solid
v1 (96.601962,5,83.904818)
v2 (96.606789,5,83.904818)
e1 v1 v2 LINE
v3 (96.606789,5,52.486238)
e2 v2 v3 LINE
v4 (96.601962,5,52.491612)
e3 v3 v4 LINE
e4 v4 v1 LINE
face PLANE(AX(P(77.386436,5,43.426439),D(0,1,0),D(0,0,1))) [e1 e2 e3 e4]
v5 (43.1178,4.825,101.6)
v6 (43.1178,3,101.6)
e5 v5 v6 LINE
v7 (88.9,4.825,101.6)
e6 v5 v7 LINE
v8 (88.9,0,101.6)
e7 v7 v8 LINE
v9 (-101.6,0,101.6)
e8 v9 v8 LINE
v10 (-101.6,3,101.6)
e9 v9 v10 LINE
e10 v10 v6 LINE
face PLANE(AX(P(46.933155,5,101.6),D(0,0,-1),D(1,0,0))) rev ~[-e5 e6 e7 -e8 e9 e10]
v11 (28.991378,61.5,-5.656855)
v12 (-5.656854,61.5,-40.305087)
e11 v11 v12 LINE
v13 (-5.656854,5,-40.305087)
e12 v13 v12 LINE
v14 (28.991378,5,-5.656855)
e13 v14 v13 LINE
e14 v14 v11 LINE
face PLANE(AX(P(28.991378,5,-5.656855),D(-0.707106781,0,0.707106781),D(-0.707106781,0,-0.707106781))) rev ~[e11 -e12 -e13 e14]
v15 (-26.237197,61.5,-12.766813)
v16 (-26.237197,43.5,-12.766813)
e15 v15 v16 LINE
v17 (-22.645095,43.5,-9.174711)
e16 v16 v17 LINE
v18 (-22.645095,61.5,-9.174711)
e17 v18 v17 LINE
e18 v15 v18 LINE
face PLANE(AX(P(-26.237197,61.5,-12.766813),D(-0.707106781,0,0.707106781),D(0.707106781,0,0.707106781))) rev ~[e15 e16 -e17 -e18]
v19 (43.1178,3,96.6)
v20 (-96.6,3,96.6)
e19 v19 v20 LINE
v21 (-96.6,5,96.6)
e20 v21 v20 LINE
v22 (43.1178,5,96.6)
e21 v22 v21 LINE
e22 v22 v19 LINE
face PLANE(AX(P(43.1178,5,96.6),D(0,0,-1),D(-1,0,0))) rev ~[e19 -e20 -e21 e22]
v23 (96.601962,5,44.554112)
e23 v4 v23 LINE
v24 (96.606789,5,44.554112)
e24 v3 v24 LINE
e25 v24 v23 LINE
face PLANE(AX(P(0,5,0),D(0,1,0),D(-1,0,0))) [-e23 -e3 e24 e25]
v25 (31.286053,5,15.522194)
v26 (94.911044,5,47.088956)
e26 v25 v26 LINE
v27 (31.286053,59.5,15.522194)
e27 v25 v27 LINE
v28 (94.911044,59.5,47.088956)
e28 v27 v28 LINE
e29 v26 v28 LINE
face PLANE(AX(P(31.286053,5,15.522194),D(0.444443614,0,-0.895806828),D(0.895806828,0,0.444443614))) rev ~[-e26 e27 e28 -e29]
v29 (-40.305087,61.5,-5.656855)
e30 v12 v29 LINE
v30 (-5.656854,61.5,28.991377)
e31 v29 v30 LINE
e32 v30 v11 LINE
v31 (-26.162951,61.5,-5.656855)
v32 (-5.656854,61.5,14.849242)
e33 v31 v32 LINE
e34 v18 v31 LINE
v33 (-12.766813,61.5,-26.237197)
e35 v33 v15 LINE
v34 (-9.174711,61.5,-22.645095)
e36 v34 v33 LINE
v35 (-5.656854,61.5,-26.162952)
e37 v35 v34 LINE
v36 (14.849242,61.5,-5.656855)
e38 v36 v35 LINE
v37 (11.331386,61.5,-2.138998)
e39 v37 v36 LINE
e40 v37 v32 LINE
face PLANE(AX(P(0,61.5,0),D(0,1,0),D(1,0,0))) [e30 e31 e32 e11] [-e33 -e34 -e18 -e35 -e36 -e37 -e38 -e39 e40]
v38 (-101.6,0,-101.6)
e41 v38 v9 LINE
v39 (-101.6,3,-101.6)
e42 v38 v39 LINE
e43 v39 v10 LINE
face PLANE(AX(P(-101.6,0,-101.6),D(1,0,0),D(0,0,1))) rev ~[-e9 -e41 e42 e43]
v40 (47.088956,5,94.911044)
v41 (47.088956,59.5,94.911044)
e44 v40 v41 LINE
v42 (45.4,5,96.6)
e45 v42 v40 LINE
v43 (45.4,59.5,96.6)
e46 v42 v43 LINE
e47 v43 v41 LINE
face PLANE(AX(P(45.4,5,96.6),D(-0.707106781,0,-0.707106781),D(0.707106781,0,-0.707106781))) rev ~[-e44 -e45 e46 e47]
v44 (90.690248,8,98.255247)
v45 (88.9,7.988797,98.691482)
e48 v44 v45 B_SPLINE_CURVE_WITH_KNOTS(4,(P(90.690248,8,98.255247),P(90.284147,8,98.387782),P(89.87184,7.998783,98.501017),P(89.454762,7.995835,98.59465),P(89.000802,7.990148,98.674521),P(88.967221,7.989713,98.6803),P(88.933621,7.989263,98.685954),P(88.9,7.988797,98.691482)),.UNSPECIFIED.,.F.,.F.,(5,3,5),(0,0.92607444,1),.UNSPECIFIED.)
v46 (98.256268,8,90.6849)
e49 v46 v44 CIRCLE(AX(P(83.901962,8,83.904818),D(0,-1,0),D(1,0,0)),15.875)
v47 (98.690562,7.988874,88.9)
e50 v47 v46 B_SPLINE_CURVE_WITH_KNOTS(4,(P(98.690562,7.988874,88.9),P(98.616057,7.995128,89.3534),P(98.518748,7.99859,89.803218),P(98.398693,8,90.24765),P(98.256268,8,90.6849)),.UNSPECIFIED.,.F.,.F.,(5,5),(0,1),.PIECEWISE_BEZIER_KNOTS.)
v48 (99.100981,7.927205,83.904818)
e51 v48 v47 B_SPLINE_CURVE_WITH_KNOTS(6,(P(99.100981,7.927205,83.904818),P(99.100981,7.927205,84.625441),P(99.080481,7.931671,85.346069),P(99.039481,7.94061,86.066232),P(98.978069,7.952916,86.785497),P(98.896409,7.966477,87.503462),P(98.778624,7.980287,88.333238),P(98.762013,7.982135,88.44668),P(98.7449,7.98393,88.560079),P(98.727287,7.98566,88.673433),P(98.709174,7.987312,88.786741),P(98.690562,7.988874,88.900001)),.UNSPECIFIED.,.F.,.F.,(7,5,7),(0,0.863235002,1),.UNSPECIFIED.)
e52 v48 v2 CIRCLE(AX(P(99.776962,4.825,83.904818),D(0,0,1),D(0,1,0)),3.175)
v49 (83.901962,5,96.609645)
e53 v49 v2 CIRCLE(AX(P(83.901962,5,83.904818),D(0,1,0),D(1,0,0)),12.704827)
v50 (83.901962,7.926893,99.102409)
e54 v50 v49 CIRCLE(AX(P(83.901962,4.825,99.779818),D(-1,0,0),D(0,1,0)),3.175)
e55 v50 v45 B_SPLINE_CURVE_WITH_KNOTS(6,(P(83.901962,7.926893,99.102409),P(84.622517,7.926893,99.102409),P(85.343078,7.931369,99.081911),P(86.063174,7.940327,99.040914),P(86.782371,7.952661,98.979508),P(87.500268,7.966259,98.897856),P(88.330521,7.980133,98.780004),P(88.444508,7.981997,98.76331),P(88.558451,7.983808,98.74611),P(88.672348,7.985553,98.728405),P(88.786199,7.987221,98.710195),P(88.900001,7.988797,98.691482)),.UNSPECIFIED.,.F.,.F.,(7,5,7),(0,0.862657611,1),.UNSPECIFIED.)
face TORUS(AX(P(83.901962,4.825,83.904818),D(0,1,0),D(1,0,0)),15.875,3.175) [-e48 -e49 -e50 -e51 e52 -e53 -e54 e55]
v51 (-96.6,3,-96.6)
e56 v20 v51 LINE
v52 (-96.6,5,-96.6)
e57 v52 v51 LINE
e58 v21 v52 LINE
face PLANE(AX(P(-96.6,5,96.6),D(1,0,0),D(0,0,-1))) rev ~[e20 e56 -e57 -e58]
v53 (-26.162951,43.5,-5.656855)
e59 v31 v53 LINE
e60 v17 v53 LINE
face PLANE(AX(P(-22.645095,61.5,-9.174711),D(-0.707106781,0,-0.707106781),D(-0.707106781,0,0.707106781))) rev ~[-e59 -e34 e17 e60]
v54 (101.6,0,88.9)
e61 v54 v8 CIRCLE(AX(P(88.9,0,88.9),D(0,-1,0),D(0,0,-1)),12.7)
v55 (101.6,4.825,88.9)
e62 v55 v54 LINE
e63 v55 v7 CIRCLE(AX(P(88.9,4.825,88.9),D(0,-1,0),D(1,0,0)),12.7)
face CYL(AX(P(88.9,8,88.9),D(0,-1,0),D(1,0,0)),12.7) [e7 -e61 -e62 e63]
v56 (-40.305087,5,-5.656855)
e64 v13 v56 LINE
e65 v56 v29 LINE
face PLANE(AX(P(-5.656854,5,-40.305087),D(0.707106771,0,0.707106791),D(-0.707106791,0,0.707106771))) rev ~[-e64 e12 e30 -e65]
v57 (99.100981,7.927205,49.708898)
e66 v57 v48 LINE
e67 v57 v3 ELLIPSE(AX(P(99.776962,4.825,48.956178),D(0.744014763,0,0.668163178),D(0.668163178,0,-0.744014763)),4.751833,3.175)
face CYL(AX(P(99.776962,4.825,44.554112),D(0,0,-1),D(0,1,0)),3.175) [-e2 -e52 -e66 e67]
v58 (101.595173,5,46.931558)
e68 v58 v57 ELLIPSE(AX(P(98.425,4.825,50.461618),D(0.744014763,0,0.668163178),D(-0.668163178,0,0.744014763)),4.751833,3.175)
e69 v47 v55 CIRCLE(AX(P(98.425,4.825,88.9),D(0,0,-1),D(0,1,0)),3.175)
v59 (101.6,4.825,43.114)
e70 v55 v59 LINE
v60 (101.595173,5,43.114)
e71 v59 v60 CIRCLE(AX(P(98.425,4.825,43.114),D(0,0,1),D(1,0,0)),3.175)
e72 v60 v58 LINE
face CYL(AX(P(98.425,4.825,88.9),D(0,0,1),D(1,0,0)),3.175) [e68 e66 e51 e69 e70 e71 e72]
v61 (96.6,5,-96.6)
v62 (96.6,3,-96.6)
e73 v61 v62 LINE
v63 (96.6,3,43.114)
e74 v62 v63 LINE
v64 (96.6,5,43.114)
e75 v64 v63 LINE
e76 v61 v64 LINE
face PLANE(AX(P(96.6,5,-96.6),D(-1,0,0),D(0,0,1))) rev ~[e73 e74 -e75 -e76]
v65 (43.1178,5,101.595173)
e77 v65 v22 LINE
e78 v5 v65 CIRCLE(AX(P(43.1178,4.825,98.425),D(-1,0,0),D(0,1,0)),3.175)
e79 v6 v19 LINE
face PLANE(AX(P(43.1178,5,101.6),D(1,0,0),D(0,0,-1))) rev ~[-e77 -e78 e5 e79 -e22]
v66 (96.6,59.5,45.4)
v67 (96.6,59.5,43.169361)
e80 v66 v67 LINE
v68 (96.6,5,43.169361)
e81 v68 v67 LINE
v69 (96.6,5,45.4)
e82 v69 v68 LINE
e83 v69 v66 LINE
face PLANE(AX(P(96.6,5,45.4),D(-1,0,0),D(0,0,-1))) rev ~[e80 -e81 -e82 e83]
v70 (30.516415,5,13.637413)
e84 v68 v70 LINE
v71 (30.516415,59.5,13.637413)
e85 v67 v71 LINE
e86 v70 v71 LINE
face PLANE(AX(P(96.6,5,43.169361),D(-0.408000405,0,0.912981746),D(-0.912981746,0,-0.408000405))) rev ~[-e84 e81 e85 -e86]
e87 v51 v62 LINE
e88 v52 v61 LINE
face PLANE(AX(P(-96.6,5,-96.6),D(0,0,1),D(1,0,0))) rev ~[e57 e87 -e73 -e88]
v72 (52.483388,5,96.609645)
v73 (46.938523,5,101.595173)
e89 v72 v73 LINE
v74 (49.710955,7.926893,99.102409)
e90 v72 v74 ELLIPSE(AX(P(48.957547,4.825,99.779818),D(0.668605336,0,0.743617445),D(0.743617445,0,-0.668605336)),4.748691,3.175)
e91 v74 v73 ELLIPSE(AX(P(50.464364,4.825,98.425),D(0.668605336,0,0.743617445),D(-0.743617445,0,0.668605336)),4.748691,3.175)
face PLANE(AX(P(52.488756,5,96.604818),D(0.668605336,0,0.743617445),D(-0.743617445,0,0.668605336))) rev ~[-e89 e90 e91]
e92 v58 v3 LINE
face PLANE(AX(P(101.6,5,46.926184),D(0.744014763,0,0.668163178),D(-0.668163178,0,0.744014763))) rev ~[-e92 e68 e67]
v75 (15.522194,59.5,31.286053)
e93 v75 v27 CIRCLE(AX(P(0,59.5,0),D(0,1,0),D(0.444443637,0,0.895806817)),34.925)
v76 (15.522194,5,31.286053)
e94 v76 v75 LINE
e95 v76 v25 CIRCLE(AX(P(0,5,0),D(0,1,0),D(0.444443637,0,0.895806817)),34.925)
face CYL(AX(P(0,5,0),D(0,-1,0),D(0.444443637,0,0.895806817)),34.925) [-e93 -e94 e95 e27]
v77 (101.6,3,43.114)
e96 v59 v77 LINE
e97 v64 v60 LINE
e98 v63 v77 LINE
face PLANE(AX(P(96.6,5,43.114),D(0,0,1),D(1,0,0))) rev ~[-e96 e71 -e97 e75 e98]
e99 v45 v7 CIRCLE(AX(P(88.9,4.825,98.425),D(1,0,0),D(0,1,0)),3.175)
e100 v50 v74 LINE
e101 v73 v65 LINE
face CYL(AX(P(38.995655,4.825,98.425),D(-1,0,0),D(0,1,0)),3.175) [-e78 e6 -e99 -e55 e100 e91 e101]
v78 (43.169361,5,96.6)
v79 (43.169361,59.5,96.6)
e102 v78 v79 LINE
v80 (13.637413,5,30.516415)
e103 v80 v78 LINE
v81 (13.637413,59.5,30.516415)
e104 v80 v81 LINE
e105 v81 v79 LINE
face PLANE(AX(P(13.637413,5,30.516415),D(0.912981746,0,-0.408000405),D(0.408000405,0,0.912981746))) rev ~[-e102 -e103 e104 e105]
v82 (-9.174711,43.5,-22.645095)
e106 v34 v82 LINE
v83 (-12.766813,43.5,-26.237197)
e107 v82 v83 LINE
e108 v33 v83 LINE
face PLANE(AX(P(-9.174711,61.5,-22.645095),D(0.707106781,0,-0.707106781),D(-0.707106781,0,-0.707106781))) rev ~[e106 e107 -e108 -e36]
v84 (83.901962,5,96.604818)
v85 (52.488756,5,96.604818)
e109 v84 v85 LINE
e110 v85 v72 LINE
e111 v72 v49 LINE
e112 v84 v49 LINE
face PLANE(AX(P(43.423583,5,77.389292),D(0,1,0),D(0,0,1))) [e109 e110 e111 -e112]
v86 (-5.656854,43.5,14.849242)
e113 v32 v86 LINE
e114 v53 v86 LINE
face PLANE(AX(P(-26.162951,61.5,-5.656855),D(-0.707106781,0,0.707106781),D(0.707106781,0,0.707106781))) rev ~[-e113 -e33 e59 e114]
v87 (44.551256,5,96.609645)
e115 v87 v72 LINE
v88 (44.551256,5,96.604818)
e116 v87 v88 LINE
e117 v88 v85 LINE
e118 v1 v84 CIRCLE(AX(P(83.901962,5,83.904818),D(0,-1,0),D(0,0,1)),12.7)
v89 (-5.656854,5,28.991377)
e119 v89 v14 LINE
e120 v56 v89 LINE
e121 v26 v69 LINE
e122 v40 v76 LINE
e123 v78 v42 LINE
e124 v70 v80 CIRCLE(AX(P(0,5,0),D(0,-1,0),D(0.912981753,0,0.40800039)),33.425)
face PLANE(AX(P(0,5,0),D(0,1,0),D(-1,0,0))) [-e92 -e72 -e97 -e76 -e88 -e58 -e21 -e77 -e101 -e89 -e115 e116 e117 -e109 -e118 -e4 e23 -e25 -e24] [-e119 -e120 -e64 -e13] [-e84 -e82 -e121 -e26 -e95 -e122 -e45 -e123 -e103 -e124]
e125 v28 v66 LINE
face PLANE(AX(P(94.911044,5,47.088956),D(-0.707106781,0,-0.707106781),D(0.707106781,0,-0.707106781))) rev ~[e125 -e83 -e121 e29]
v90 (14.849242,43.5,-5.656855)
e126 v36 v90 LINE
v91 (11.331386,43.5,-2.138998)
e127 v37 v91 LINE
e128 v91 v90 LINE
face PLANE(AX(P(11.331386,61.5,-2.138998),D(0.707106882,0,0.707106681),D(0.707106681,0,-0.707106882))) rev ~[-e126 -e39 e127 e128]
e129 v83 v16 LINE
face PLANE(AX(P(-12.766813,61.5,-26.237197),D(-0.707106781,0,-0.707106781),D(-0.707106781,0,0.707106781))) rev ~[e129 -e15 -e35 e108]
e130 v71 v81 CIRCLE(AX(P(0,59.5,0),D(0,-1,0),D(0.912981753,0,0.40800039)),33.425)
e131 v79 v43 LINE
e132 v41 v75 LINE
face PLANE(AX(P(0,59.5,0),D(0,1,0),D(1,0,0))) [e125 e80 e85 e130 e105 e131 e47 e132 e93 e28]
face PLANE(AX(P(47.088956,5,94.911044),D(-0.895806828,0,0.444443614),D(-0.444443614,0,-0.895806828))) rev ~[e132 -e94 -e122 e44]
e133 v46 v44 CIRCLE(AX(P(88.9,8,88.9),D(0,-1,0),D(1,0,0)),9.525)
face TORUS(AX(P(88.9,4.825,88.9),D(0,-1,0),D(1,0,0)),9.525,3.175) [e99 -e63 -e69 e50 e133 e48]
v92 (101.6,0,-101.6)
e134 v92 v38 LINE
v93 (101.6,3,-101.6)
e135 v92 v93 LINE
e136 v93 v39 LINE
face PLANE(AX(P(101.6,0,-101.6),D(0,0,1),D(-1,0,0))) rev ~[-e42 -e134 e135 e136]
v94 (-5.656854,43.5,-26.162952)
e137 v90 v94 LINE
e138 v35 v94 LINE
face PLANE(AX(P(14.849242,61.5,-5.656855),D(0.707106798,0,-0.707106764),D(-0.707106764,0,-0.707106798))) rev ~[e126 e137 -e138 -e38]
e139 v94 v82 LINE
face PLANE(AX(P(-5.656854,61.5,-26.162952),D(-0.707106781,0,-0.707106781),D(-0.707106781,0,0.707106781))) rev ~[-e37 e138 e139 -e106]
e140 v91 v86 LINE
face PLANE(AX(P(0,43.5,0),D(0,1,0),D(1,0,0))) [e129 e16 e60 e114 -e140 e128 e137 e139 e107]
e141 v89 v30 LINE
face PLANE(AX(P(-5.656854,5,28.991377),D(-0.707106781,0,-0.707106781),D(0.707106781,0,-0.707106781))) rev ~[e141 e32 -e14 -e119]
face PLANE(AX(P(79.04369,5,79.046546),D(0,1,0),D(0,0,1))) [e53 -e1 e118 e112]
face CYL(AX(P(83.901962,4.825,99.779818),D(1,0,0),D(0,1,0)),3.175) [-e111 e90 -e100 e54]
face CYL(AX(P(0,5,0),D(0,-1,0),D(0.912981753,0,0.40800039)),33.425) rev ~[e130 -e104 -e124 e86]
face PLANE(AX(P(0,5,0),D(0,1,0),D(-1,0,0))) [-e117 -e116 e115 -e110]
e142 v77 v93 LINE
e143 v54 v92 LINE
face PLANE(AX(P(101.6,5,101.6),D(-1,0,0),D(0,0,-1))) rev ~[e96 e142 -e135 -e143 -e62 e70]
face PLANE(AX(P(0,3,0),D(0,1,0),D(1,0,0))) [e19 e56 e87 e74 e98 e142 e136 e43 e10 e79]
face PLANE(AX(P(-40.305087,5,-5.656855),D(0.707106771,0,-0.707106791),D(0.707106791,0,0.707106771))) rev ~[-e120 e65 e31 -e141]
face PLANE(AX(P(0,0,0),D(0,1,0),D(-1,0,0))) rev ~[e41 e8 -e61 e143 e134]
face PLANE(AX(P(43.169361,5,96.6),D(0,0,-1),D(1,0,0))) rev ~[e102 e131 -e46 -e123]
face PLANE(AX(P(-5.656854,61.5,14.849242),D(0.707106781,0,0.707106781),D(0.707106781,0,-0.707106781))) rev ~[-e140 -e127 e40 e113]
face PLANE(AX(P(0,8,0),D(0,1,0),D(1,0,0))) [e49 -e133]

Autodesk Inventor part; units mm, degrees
ref_plane "YZ Plane" through (0, 0, 0) normal (1, 0, 0) x (0, 1, 0)
ref_plane "XZ Plane" through (0, 0, 0) normal (0, 1, 0) x (-1, 0, 0)
ref_plane "XY Plane" through (0, 0, 0) normal (0, 0, 1) x (1, 0, 0)
sketch "Sketch1" plane through (0, 0, 0) normal (0, 1, 0) x (-1, 0, 0)
  line L0 (101.6, -101.6) -> (-101.6, -101.6)
  line L1 (-101.6, -101.6) -> (-101.6, 101.6)
  line L2 (-101.6, 101.6) -> (101.6, 101.6)
  line L3 (101.6, 101.6) -> (101.6, -101.6)
  line L4 (96.6, -96.6) -> (-96.6, -96.6)
  line L5 (-96.6, -96.6) -> (-96.6, 96.6)
  line L6 (-96.6, 96.6) -> (96.6, 96.6)
  line L7 (96.6, 96.6) -> (96.6, -96.6)
  line L8 (101.6, 101.6) -> (-40.4, 101.6)
  circle A0 centre (0, 0) radius 88.9
  circle A1 centre (0, 0) radius 109.337642
  line L9 (-40.4, 101.6) -> (-101.6, 40.4)
  line L10 (-45.4, 101.6) -> (-101.6, 45.4)
  line L11 (96.6, 96.6) -> (96.6, 101.6)
  line L12 (-45.4, 101.6) -> (-35.4, 101.6)
  line L13 (-35.4, 101.6) -> (-35.4, 96.6)
  line L14 (-35.4, 96.6) -> (-45.4, 96.6)
  line L15 (-45.4, 96.6) -> (-45.4, 101.6)
  line L16 (-45.4, 101.6) -> (-43.114, 101.6)
  line L17 (-43.114, 101.6) -> (-43.114, 96.6)
  line L18 (-43.114, 96.6) -> (-45.4, 96.6)
  line L19 (-45.4, 96.6) -> (-45.4, 101.6)
  line L20 (-96.6, 45.4) -> (-101.6, 45.4)
  line L21 (-101.6, 45.4) -> (-101.6, 43.114)
  line L22 (-101.6, 43.114) -> (-96.6, 43.114)
  line L23 (-96.6, 43.114) -> (-96.6, 45.4)
  point P0 (96.6, 51.216794)
  point P1 (101.6, 40.4)
  point P2 (101.6, -40.4)
  point P3 (96.6, -51.216794)
  point P4 (-96.6, 45.4)
  point P5 (-45.4, 96.6)
  dimension "d0" = 203.2
  dimension "d1" = 203.2
  dimension "d2" = 101.6
  dimension "d3" = 101.6
  dimension "d4" = 5
  dimension "d5" = 5
  dimension "d6" = 5
  dimension "d7" = 5
  dimension "d10" = 142
  dimension "d12" = 61.2
  dimension "d14" = 177.8
  dimension "d15" = 5
  dimension "d16" = 5
  dimension "d17" = 10
  dimension "d86" = 2.286
  dimension "d87" = 2.286
sketch "Sketch1 outline for Extrusion1" plane through (0, 0, 0) normal (0, 1, 0) x (-1, 0, 0)
  line L0 (-101.6, -101.6) -> (101.6, -101.6)
  line L1 (101.6, -101.6) -> (101.6, 101.6)
  line L2 (101.6, 101.6) -> (-101.6, 101.6)
  line L3 (-101.6, 101.6) -> (-101.6, -101.6)
extrude "Extrusion1" add sketch "Sketch1 outline for Extrusion1" along normal blind 5
sketch "Sketch3" plane through (0, 5, 0) normal (0, 1, 0) x (1, 0, 0)
  circle A0 centre (0, 0) radius 88.9
  line L0 (-101.6, 101.6) -> (-101.6, -101.6)
  line L1 (-101.6, -101.6) -> (101.6, -101.6)
  line L2 (-101.6, 101.6) -> (101.6, 101.6)
  line L3 (101.6, 101.6) -> (101.6, -101.6)
  line L4 (101.6, -101.6) -> (-101.6, -101.6)
  line L5 (-101.6, -101.6) -> (-101.6, 101.6)
  line L6 (-96.6, 96.6) -> (96.6, 96.6)
  line L7 (96.6, 96.6) -> (96.6, -96.6)
  line L8 (96.6, -96.6) -> (-96.6, -96.6)
  line L9 (-96.6, -96.6) -> (-96.6, 96.6)
  line L10 (-101.6, -101.6) -> (40.4, -101.6)
  circle A1 centre (0, 0) radius 109.337642
  line L11 (40.4, -101.6) -> (101.6, -40.4)
  line L12 (101.6, -101.6) -> (101.6, 101.6)
  line L13 (45.4038, -101.6) -> (101.6, -45.4038)
  line L14 (96.6, -45.4) -> (101.6, -45.4038)
  line L15 (45.4, -96.6) -> (45.4038, -101.6)
  line L16 (96.6, -45.4) -> (101.6, -45.4)
  line L17 (101.6, -45.4) -> (101.6, -43.114)
  line L18 (101.6, -43.114) -> (96.6, -43.114)
  line L19 (96.6, -43.114) -> (96.6, -45.4)
  line L20 (45.4038, -101.6) -> (43.1178, -101.6)
  line L21 (43.1178, -101.6) -> (43.1178, -96.6)
  line L22 (43.1178, -96.6) -> (45.4038, -96.6)
  line L23 (45.4038, -96.6) -> (45.4038, -101.6)
  point P0 (45.4038, -101.6)
  point P1 (50.4038, -96.6)
  point P2 (96.6, -50.4038)
  dimension "d28" = 177.8
  dimension "d29" = 5
  dimension "d30" = 5
  dimension "d31" = 5
  dimension "d32" = 5
  dimension "d33" = 142
  dimension "d76" = 5.0038
  dimension "d77" = 5.0038
  dimension "d88" = 2.286
  dimension "d89" = 2.286
sketch "Sketch3 outline for Extrusion3" plane through (0, 5, 0) normal (0, 1, 0) x (1, 0, 0)
  line L0 (43.1178, -101.6) -> (43.1178, -96.6)
  line L1 (-101.6, -101.6) -> (43.1178, -101.6)
  line L2 (-101.6, 101.6) -> (-101.6, -101.6)
  line L3 (101.6, 101.6) -> (-101.6, 101.6)
  line L4 (101.6, -43.114) -> (101.6, 101.6)
  line L5 (96.6, -43.114) -> (101.6, -43.114)
  line L6 (96.6, 96.6) -> (96.6, -43.114)
  line L7 (-96.6, 96.6) -> (96.6, 96.6)
  line L8 (-96.6, -96.6) -> (-96.6, 96.6)
  line L9 (43.1178, -96.6) -> (-96.6, -96.6)
extrude "Extrusion3" cut sketch "Sketch3 outline for Extrusion3" against normal blind 2
sketch "Sketch4" plane through (0, 5, 0) normal (0, 1, 0) x (1, 0, 0)
  line L0 (101.6, 101.6) -> (-101.6, 101.6)
  line L1 (-101.6, 101.6) -> (-101.6, -101.6)
  line L2 (-101.6, -101.6) -> (101.6, -101.6)
  line L3 (101.6, -101.6) -> (101.6, 101.6)
  circle A0 centre (0, 0) radius 2.5
  line L4 (11.331386, 2.138998) -> (-2.138998, -11.331386)
  line L5 (0, 0) -> (-5.656854, 5.656854)
  line L6 (-5.656854, -14.849242) -> (-26.162951, 5.656855)
  line L7 (-5.656854, 26.162952) -> (14.849242, 5.656855)
  circle A1 centre (-5.656854, 5.656854) radius 14
  line L8 (-26.162951, 5.656855) -> (-5.656854, 26.162952)
  line L9 (14.849242, 5.656855) -> (-5.656854, -14.849242)
  line L10 (-40.305087, 5.656855) -> (-5.656854, 40.305087)
  line L11 (-5.656854, 40.305087) -> (28.991378, 5.656855)
  line L12 (28.991378, 5.656855) -> (-5.656854, -28.991377)
  line L13 (-5.656854, -28.991377) -> (-40.305087, 5.656855)
  line L14 (-22.645095, 9.174711) -> (-9.174711, 22.645095)
  line L15 (-9.174711, 22.645095) -> (-12.766813, 26.237197)
  line L16 (-12.766813, 26.237197) -> (-26.237197, 12.766813)
  line L17 (-26.237197, 12.766813) -> (-22.645095, 9.174711)
  point P0 (9.525, 22.5)
  point P1 (-9.525, -6.5)
  dimension "d37" = 203.2
  dimension "d38" = 203.2
  dimension "d39" = 8
  dimension "d40" = 28
  dimension "d41" = 29
  dimension "d42" = 29
  dimension "d43" = 14.5
  dimension "d44" = 10
  dimension "d45" = 10
  dimension "d46" = 10
  dimension "d47" = 10
  dimension "d48" = 5.08
  dimension "d49" = 9.525
  dimension "d50" = 9.525
  dimension "d55" = 101.6
  dimension "d56" = 101.6
sketch "Sketch4 outline for Extrusion4" plane through (0, 5, 0) normal (0, 1, 0) x (1, 0, 0)
  line L0 (-40.305087, 5.656855) -> (-5.656854, -28.991377)
  line L1 (-5.656854, 40.305087) -> (-40.305087, 5.656855)
  line L2 (28.991378, 5.656855) -> (-5.656854, 40.305087)
  line L3 (-5.656854, -28.991377) -> (28.991378, 5.656855)
extrude "Extrusion4" add sketch "Sketch4 outline for Extrusion4" along normal blind 56.5
sketch "Sketch5" plane through (0, 61.5, 0) normal (0, 1, 0) x (1, 0, 0)
  circle A0 centre (0, 0) radius 2.5
  line L0 (11.331386, 2.138998) -> (-2.138998, -11.331386)
  line L1 (0, 0) -> (-5.656854, 5.656854)
  line L2 (-5.656854, -14.849242) -> (-26.162951, 5.656855)
  line L3 (-5.656854, 26.162952) -> (14.849242, 5.656855)
  circle A1 centre (-5.656854, 5.656854) radius 14
  line L4 (-26.162951, 5.656855) -> (-5.656854, 26.162952)
  line L5 (14.849242, 5.656855) -> (-5.656854, -14.849242)
  line L6 (-40.305087, 5.656855) -> (-5.656854, 40.305087)
  line L7 (-5.656854, 40.305087) -> (28.991378, 5.656855)
  line L8 (28.991378, 5.656855) -> (-5.656854, -28.991377)
  line L9 (-5.656854, -28.991377) -> (-40.305087, 5.656855)
  line L10 (-22.645095, 9.174711) -> (-9.174711, 22.645095)
  line L11 (-9.174711, 22.645095) -> (-12.766813, 26.237197)
  line L12 (-12.766813, 26.237197) -> (-26.237197, 12.766813)
  line L13 (-26.237197, 12.766813) -> (-22.645095, 9.174711)
  point P0 (-2.138998, -11.331386)
  point P1 (-9.174711, 22.645095)
  dimension "d57" = 8
  dimension "d58" = 28
  dimension "d59" = 29
  dimension "d60" = 29
  dimension "d61" = 14.5
  dimension "d62" = 10
  dimension "d63" = 10
  dimension "d64" = 10
  dimension "d65" = 10
  dimension "d66" = 5.08
  dimension "d67" = 9.525
  dimension "d68" = 9.525
sketch "Sketch5 outline for Extrusion5" plane through (0, 61.5, 0) normal (0, 1, 0) x (1, 0, 0)
  line L0 (-26.162951, 5.656855) -> (-5.656854, -14.849242)
  line L1 (-22.645095, 9.174711) -> (-26.162951, 5.656855)
  line L2 (-26.237197, 12.766813) -> (-22.645095, 9.174711)
  line L3 (-12.766813, 26.237197) -> (-26.237197, 12.766813)
  line L4 (-9.174711, 22.645095) -> (-12.766813, 26.237197)
  line L5 (-5.656854, 26.162952) -> (-9.174711, 22.645095)
  line L6 (14.849242, 5.656855) -> (-5.656854, 26.162952)
  line L7 (11.331386, 2.138998) -> (14.849242, 5.656855)
  line L8 (-2.138998, -11.331386) -> (11.331386, 2.138998)
  line L9 (-5.656854, -14.849242) -> (-2.138998, -11.331386)
extrude "Extrusion5" cut sketch "Sketch5 outline for Extrusion5" against normal blind 18
sketch "Sketch6" plane through (0, 5, 0) normal (0, 1, 0) x (1, 0, 0)
  line L0 (45.4038, -101.6) -> (0, 0)
  line L1 (50.4038, -96.6) -> (45.4038, -101.6)
  line L2 (96.6, -43.114) -> (96.6, 96.6)
  line L3 (101.6, -101.6) -> (101.6, 101.6)
  circle A0 centre (0, 0) radius 34.925
  circle A1 centre (0, 0) radius 33.425
  line L4 (-101.6, 101.6) -> (-101.6, -101.6)
  line L5 (-101.6, -101.6) -> (40.4, -101.6)
  line L6 (-101.6, -101.6) -> (101.6, -101.6)
  line L7 (101.6, 101.6) -> (101.6, -43.114)
  line L8 (101.6, -45.4038) -> (0, 0)
  line L9 (-96.6, -96.6) -> (43.1178, -96.6)
  line L10 (96.6, -43.114) -> (96.6, 96.6)
  line L11 (43.1178, -101.6) -> (-101.6, -101.6)
  line L12 (101.6, -45.4038) -> (96.6, -50.4038)
  line L13 (45.4038, -101.6) -> (101.6, -45.4038)
  line L14 (43.1178, -101.6) -> (101.6, -101.6)
  line L15 (0, 0) -> (101.6, -50.4076)
  line L16 (50.4076, -101.6) -> (0, 0)
  line L17 (43.169361, -96.6) -> (47.926911, -96.6)
  line L18 (96.6, -43.169361) -> (96.6, -47.926911)
  line L19 (40.4, -101.6) -> (101.6, -40.4)
  point P0 (13.637413, -30.516415)
  point P1 (30.516415, -13.637413)
  point P2 (14.249414, -31.885888)
  point P3 (31.286053, -15.522194)
  point P4 (29.942343, -14.855528)
  point P5 (31.885888, -14.249414)
  point P6 (98.255522, -48.748278)
  point P7 (96.6, -47.926911)
  point P8 (47.926911, -96.6)
  point P9 (15.522194, -31.286053)
  point P10 (96.6, -45.4)
  point P11 (45.4, -96.6)
  point P12 (14.855528, -29.942343)
  point P13 (96.6, -45.4)
  point P14 (45.4, -96.6)
  point P15 (45.4, -96.6)
  point P16 (47.088956, -94.911044)
  point P17 (94.911044, -47.088956)
  point P18 (96.6, -45.4)
  point P19 (43.858319, -98.141681)
  point P20 (98.141681, -43.858319)
  point P21 (45.4, -96.6)
  point P22 (96.6, -45.4)
  dimension "d71" = 69.85
  dimension "d72" = 66.85
  dimension "d75" = 142
  dimension "d78" = 5.0038
  dimension "d82" = 5.0038
sketch "Sketch6 outline for Extrusion6" plane through (0, 5, 0) normal (0, 1, 0) x (1, 0, 0)
  line L0 (45.4, -96.6) -> (47.088956, -94.911044)
  line L1 (43.169361, -96.6) -> (45.4, -96.6)
  line L2 (13.637413, -30.516415) -> (43.169361, -96.6)
  arc A0 (30.516415, -13.637413) -> (13.637413, -30.516415) centre (0, 0) cw
  line L3 (96.6, -43.169361) -> (30.516415, -13.637413)
  line L4 (96.6, -45.4) -> (96.6, -43.169361)
  line L5 (94.911044, -47.088956) -> (96.6, -45.4)
  line L6 (31.286053, -15.522194) -> (94.911044, -47.088956)
  arc A1 (15.522194, -31.286053) -> (31.286053, -15.522194) centre (0, 0) ccw
  line L7 (47.088956, -94.911044) -> (15.522194, -31.286053)
extrude "Extrusion6" add sketch "Sketch6 outline for Extrusion6" along normal blind 54.5
sketch "Sketch8" plane through (0, 5, 0) normal (0, 1, 0) x (1, 0, 0)
  line L0 (101.6, -101.6) -> (101.6, 101.6)
  line L1 (-96.6, -96.6) -> (43.1178, -96.6)
  line L2 (101.6, -101.6) -> (43.1178, -101.6)
  line L3 (43.1178, -101.6) -> (43.1178, -96.6)
  line L4 (43.1178, -96.6) -> (101.6, -96.6)
  line L5 (101.6, -96.6) -> (101.6, -101.6)
  line L6 (96.6, -43.114) -> (96.6, 96.6)
  line L7 (101.6, -101.6) -> (96.6, -101.6)
  line L8 (96.6, -101.6) -> (96.6, -43.114)
  line L9 (96.6, -43.114) -> (101.6, -43.114)
  line L10 (101.6, -43.114) -> (101.6, -101.6)
  line L11 (96.6, -45.4) -> (94.911044, -47.088956)
  line L12 (47.088956, -94.911044) -> (15.522194, -31.286053)
  line L13 (43.1178, -101.6) -> (101.6, -101.6)
  line L14 (43.1178, -101.6) -> (-101.6, -101.6)
  line L15 (-101.6, -101.6) -> (40.4, -101.6)
  line L16 (101.601962, -101.604818) -> (-101.598038, -101.604818)
  line L17 (-101.598038, -101.604818) -> (-101.598038, 101.595182)
  line L18 (-101.598038, 101.595182) -> (101.601962, 101.595182)
  line L19 (101.601962, 101.595182) -> (101.601962, -101.604818)
  line L20 (96.601962, -96.604818) -> (-96.598038, -96.604818)
  line L21 (-96.598038, -96.604818) -> (-96.598038, 96.595182)
  line L22 (-96.598038, 96.595182) -> (96.601962, 96.595182)
  line L23 (96.601962, 96.595182) -> (96.601962, -96.604818)
  line L24 (101.601962, 101.595182) -> (-40.398038, 101.595182)
  circle A0 centre (0.001962, -0.004818) radius 88.9
  circle A1 centre (0.001962, -0.004818) radius 109.337642
  line L25 (-40.398038, 101.595182) -> (-101.598038, 40.395182)
  line L26 (-45.398038, 101.595182) -> (-101.598038, 45.395182)
  line L27 (96.601962, 96.595182) -> (96.601962, 101.595182)
  line L28 (-45.398038, 101.595182) -> (-35.398038, 101.595182)
  line L29 (-35.398038, 101.595182) -> (-35.398038, 96.595182)
  line L30 (-35.398038, 96.595182) -> (-45.398038, 96.595182)
  line L31 (-45.398038, 96.595182) -> (-45.398038, 101.595182)
  line L32 (43.1178, -96.6) -> (43.1178, -101.6)
  line L33 (43.1178, -100.4824) -> (43.1178, -101.6)
  line L34 (51.218756, -96.604818) -> (52.336356, -96.604818)
  line L35 (100.4824, -43.114) -> (101.6, -43.114)
  line L36 (96.601962, -51.221612) -> (96.601962, -52.339212)
  line L37 (43.1178, -101.6) -> (46.927797, -101.604818)
  line L38 (101.6, -43.114) -> (101.601962, -46.923999)
  line L39 (101.601962, -46.923999) -> (96.601962, -52.491612)
  line L40 (96.601962, -51.221612) -> (96.601962, -54.317383)
  line L41 (46.927797, -101.604818) -> (52.488756, -96.604818)
  line L42 (51.218756, -96.604818) -> (52.488756, -96.604818)
  point P0 (0, 0)
  point P1 (-96.598038, -96.6)
  point P2 (43.1178, -96.604818)
  point P3 (101.6, -46.926184)
  point P4 (46.933155, -101.6)
  dimension "d93" = 142
  dimension "d94" = 203.2
  dimension "d95" = 203.2
  dimension "d96" = 101.6
  dimension "d97" = 101.6
  dimension "d98" = 5
  dimension "d99" = 5
  dimension "d100" = 5
  dimension "d101" = 5
  dimension "d102" = 142
  dimension "d103" = 61.2
  dimension "d104" = 177.8
  dimension "d105" = 5
  dimension "d106" = 5
  dimension "d107" = 10
  dimension "d116" = 3.81
  dimension "d117" = 3.81
  dimension "d118" = 1.27
  dimension "d119" = 1.27
sketch "Sketch8 outline for Extrusion7" plane through (0, 5, 0) normal (0, 1, 0) x (1, 0, 0)
  line L0 (101.6, -46.926184) -> (96.601962, -52.491612)
  line L1 (101.6, -101.6) -> (101.6, -46.926184)
  line L2 (46.933155, -101.6) -> (101.6, -101.6)
  line L3 (52.488756, -96.604818) -> (46.933155, -101.6)
  line L4 (96.601962, -96.604818) -> (52.488756, -96.604818)
  line L5 (96.601962, -52.491612) -> (96.601962, -96.604818)
extrude "Extrusion7" add sketch "Sketch8 outline for Extrusion7" along normal blind 3
fillet "Fillet3" radius 12.7 2 edges at (101.6, 4, 101.6) (96.602, 6.5, 96.6048)
fillet "Fillet4" radius 3.175 6 edges at (97.8803, 8, 97.8803) (101.6, 8, 67.9131) (67.9166, 8, 101.6) (92.8822, 8, 92.8851) (96.602, 8, 68.1982) (68.1954, 8, 96.6048)
sketch "Sketch9" plane through (0, 61.5, 0) normal (0, 1, 0) x (1, 0, 0)
  point P0 (0, 0)
sketch "Sketch10" plane through (0, 5, 0) normal (0, 1, 0) x (1, 0, 0)
  point P0 (0, 0)
equation "\"d1\" = d0"
equation "\"d2\" = 0.5 * d0"
equation "\"d3\" = 0.5 * d0"
equation "\"d95\" = d94"
equation "\"d96\" = 0.5 * d94"
equation "\"d97\" = 0.5 * d94"
properties part number "Box_Walls_2"
